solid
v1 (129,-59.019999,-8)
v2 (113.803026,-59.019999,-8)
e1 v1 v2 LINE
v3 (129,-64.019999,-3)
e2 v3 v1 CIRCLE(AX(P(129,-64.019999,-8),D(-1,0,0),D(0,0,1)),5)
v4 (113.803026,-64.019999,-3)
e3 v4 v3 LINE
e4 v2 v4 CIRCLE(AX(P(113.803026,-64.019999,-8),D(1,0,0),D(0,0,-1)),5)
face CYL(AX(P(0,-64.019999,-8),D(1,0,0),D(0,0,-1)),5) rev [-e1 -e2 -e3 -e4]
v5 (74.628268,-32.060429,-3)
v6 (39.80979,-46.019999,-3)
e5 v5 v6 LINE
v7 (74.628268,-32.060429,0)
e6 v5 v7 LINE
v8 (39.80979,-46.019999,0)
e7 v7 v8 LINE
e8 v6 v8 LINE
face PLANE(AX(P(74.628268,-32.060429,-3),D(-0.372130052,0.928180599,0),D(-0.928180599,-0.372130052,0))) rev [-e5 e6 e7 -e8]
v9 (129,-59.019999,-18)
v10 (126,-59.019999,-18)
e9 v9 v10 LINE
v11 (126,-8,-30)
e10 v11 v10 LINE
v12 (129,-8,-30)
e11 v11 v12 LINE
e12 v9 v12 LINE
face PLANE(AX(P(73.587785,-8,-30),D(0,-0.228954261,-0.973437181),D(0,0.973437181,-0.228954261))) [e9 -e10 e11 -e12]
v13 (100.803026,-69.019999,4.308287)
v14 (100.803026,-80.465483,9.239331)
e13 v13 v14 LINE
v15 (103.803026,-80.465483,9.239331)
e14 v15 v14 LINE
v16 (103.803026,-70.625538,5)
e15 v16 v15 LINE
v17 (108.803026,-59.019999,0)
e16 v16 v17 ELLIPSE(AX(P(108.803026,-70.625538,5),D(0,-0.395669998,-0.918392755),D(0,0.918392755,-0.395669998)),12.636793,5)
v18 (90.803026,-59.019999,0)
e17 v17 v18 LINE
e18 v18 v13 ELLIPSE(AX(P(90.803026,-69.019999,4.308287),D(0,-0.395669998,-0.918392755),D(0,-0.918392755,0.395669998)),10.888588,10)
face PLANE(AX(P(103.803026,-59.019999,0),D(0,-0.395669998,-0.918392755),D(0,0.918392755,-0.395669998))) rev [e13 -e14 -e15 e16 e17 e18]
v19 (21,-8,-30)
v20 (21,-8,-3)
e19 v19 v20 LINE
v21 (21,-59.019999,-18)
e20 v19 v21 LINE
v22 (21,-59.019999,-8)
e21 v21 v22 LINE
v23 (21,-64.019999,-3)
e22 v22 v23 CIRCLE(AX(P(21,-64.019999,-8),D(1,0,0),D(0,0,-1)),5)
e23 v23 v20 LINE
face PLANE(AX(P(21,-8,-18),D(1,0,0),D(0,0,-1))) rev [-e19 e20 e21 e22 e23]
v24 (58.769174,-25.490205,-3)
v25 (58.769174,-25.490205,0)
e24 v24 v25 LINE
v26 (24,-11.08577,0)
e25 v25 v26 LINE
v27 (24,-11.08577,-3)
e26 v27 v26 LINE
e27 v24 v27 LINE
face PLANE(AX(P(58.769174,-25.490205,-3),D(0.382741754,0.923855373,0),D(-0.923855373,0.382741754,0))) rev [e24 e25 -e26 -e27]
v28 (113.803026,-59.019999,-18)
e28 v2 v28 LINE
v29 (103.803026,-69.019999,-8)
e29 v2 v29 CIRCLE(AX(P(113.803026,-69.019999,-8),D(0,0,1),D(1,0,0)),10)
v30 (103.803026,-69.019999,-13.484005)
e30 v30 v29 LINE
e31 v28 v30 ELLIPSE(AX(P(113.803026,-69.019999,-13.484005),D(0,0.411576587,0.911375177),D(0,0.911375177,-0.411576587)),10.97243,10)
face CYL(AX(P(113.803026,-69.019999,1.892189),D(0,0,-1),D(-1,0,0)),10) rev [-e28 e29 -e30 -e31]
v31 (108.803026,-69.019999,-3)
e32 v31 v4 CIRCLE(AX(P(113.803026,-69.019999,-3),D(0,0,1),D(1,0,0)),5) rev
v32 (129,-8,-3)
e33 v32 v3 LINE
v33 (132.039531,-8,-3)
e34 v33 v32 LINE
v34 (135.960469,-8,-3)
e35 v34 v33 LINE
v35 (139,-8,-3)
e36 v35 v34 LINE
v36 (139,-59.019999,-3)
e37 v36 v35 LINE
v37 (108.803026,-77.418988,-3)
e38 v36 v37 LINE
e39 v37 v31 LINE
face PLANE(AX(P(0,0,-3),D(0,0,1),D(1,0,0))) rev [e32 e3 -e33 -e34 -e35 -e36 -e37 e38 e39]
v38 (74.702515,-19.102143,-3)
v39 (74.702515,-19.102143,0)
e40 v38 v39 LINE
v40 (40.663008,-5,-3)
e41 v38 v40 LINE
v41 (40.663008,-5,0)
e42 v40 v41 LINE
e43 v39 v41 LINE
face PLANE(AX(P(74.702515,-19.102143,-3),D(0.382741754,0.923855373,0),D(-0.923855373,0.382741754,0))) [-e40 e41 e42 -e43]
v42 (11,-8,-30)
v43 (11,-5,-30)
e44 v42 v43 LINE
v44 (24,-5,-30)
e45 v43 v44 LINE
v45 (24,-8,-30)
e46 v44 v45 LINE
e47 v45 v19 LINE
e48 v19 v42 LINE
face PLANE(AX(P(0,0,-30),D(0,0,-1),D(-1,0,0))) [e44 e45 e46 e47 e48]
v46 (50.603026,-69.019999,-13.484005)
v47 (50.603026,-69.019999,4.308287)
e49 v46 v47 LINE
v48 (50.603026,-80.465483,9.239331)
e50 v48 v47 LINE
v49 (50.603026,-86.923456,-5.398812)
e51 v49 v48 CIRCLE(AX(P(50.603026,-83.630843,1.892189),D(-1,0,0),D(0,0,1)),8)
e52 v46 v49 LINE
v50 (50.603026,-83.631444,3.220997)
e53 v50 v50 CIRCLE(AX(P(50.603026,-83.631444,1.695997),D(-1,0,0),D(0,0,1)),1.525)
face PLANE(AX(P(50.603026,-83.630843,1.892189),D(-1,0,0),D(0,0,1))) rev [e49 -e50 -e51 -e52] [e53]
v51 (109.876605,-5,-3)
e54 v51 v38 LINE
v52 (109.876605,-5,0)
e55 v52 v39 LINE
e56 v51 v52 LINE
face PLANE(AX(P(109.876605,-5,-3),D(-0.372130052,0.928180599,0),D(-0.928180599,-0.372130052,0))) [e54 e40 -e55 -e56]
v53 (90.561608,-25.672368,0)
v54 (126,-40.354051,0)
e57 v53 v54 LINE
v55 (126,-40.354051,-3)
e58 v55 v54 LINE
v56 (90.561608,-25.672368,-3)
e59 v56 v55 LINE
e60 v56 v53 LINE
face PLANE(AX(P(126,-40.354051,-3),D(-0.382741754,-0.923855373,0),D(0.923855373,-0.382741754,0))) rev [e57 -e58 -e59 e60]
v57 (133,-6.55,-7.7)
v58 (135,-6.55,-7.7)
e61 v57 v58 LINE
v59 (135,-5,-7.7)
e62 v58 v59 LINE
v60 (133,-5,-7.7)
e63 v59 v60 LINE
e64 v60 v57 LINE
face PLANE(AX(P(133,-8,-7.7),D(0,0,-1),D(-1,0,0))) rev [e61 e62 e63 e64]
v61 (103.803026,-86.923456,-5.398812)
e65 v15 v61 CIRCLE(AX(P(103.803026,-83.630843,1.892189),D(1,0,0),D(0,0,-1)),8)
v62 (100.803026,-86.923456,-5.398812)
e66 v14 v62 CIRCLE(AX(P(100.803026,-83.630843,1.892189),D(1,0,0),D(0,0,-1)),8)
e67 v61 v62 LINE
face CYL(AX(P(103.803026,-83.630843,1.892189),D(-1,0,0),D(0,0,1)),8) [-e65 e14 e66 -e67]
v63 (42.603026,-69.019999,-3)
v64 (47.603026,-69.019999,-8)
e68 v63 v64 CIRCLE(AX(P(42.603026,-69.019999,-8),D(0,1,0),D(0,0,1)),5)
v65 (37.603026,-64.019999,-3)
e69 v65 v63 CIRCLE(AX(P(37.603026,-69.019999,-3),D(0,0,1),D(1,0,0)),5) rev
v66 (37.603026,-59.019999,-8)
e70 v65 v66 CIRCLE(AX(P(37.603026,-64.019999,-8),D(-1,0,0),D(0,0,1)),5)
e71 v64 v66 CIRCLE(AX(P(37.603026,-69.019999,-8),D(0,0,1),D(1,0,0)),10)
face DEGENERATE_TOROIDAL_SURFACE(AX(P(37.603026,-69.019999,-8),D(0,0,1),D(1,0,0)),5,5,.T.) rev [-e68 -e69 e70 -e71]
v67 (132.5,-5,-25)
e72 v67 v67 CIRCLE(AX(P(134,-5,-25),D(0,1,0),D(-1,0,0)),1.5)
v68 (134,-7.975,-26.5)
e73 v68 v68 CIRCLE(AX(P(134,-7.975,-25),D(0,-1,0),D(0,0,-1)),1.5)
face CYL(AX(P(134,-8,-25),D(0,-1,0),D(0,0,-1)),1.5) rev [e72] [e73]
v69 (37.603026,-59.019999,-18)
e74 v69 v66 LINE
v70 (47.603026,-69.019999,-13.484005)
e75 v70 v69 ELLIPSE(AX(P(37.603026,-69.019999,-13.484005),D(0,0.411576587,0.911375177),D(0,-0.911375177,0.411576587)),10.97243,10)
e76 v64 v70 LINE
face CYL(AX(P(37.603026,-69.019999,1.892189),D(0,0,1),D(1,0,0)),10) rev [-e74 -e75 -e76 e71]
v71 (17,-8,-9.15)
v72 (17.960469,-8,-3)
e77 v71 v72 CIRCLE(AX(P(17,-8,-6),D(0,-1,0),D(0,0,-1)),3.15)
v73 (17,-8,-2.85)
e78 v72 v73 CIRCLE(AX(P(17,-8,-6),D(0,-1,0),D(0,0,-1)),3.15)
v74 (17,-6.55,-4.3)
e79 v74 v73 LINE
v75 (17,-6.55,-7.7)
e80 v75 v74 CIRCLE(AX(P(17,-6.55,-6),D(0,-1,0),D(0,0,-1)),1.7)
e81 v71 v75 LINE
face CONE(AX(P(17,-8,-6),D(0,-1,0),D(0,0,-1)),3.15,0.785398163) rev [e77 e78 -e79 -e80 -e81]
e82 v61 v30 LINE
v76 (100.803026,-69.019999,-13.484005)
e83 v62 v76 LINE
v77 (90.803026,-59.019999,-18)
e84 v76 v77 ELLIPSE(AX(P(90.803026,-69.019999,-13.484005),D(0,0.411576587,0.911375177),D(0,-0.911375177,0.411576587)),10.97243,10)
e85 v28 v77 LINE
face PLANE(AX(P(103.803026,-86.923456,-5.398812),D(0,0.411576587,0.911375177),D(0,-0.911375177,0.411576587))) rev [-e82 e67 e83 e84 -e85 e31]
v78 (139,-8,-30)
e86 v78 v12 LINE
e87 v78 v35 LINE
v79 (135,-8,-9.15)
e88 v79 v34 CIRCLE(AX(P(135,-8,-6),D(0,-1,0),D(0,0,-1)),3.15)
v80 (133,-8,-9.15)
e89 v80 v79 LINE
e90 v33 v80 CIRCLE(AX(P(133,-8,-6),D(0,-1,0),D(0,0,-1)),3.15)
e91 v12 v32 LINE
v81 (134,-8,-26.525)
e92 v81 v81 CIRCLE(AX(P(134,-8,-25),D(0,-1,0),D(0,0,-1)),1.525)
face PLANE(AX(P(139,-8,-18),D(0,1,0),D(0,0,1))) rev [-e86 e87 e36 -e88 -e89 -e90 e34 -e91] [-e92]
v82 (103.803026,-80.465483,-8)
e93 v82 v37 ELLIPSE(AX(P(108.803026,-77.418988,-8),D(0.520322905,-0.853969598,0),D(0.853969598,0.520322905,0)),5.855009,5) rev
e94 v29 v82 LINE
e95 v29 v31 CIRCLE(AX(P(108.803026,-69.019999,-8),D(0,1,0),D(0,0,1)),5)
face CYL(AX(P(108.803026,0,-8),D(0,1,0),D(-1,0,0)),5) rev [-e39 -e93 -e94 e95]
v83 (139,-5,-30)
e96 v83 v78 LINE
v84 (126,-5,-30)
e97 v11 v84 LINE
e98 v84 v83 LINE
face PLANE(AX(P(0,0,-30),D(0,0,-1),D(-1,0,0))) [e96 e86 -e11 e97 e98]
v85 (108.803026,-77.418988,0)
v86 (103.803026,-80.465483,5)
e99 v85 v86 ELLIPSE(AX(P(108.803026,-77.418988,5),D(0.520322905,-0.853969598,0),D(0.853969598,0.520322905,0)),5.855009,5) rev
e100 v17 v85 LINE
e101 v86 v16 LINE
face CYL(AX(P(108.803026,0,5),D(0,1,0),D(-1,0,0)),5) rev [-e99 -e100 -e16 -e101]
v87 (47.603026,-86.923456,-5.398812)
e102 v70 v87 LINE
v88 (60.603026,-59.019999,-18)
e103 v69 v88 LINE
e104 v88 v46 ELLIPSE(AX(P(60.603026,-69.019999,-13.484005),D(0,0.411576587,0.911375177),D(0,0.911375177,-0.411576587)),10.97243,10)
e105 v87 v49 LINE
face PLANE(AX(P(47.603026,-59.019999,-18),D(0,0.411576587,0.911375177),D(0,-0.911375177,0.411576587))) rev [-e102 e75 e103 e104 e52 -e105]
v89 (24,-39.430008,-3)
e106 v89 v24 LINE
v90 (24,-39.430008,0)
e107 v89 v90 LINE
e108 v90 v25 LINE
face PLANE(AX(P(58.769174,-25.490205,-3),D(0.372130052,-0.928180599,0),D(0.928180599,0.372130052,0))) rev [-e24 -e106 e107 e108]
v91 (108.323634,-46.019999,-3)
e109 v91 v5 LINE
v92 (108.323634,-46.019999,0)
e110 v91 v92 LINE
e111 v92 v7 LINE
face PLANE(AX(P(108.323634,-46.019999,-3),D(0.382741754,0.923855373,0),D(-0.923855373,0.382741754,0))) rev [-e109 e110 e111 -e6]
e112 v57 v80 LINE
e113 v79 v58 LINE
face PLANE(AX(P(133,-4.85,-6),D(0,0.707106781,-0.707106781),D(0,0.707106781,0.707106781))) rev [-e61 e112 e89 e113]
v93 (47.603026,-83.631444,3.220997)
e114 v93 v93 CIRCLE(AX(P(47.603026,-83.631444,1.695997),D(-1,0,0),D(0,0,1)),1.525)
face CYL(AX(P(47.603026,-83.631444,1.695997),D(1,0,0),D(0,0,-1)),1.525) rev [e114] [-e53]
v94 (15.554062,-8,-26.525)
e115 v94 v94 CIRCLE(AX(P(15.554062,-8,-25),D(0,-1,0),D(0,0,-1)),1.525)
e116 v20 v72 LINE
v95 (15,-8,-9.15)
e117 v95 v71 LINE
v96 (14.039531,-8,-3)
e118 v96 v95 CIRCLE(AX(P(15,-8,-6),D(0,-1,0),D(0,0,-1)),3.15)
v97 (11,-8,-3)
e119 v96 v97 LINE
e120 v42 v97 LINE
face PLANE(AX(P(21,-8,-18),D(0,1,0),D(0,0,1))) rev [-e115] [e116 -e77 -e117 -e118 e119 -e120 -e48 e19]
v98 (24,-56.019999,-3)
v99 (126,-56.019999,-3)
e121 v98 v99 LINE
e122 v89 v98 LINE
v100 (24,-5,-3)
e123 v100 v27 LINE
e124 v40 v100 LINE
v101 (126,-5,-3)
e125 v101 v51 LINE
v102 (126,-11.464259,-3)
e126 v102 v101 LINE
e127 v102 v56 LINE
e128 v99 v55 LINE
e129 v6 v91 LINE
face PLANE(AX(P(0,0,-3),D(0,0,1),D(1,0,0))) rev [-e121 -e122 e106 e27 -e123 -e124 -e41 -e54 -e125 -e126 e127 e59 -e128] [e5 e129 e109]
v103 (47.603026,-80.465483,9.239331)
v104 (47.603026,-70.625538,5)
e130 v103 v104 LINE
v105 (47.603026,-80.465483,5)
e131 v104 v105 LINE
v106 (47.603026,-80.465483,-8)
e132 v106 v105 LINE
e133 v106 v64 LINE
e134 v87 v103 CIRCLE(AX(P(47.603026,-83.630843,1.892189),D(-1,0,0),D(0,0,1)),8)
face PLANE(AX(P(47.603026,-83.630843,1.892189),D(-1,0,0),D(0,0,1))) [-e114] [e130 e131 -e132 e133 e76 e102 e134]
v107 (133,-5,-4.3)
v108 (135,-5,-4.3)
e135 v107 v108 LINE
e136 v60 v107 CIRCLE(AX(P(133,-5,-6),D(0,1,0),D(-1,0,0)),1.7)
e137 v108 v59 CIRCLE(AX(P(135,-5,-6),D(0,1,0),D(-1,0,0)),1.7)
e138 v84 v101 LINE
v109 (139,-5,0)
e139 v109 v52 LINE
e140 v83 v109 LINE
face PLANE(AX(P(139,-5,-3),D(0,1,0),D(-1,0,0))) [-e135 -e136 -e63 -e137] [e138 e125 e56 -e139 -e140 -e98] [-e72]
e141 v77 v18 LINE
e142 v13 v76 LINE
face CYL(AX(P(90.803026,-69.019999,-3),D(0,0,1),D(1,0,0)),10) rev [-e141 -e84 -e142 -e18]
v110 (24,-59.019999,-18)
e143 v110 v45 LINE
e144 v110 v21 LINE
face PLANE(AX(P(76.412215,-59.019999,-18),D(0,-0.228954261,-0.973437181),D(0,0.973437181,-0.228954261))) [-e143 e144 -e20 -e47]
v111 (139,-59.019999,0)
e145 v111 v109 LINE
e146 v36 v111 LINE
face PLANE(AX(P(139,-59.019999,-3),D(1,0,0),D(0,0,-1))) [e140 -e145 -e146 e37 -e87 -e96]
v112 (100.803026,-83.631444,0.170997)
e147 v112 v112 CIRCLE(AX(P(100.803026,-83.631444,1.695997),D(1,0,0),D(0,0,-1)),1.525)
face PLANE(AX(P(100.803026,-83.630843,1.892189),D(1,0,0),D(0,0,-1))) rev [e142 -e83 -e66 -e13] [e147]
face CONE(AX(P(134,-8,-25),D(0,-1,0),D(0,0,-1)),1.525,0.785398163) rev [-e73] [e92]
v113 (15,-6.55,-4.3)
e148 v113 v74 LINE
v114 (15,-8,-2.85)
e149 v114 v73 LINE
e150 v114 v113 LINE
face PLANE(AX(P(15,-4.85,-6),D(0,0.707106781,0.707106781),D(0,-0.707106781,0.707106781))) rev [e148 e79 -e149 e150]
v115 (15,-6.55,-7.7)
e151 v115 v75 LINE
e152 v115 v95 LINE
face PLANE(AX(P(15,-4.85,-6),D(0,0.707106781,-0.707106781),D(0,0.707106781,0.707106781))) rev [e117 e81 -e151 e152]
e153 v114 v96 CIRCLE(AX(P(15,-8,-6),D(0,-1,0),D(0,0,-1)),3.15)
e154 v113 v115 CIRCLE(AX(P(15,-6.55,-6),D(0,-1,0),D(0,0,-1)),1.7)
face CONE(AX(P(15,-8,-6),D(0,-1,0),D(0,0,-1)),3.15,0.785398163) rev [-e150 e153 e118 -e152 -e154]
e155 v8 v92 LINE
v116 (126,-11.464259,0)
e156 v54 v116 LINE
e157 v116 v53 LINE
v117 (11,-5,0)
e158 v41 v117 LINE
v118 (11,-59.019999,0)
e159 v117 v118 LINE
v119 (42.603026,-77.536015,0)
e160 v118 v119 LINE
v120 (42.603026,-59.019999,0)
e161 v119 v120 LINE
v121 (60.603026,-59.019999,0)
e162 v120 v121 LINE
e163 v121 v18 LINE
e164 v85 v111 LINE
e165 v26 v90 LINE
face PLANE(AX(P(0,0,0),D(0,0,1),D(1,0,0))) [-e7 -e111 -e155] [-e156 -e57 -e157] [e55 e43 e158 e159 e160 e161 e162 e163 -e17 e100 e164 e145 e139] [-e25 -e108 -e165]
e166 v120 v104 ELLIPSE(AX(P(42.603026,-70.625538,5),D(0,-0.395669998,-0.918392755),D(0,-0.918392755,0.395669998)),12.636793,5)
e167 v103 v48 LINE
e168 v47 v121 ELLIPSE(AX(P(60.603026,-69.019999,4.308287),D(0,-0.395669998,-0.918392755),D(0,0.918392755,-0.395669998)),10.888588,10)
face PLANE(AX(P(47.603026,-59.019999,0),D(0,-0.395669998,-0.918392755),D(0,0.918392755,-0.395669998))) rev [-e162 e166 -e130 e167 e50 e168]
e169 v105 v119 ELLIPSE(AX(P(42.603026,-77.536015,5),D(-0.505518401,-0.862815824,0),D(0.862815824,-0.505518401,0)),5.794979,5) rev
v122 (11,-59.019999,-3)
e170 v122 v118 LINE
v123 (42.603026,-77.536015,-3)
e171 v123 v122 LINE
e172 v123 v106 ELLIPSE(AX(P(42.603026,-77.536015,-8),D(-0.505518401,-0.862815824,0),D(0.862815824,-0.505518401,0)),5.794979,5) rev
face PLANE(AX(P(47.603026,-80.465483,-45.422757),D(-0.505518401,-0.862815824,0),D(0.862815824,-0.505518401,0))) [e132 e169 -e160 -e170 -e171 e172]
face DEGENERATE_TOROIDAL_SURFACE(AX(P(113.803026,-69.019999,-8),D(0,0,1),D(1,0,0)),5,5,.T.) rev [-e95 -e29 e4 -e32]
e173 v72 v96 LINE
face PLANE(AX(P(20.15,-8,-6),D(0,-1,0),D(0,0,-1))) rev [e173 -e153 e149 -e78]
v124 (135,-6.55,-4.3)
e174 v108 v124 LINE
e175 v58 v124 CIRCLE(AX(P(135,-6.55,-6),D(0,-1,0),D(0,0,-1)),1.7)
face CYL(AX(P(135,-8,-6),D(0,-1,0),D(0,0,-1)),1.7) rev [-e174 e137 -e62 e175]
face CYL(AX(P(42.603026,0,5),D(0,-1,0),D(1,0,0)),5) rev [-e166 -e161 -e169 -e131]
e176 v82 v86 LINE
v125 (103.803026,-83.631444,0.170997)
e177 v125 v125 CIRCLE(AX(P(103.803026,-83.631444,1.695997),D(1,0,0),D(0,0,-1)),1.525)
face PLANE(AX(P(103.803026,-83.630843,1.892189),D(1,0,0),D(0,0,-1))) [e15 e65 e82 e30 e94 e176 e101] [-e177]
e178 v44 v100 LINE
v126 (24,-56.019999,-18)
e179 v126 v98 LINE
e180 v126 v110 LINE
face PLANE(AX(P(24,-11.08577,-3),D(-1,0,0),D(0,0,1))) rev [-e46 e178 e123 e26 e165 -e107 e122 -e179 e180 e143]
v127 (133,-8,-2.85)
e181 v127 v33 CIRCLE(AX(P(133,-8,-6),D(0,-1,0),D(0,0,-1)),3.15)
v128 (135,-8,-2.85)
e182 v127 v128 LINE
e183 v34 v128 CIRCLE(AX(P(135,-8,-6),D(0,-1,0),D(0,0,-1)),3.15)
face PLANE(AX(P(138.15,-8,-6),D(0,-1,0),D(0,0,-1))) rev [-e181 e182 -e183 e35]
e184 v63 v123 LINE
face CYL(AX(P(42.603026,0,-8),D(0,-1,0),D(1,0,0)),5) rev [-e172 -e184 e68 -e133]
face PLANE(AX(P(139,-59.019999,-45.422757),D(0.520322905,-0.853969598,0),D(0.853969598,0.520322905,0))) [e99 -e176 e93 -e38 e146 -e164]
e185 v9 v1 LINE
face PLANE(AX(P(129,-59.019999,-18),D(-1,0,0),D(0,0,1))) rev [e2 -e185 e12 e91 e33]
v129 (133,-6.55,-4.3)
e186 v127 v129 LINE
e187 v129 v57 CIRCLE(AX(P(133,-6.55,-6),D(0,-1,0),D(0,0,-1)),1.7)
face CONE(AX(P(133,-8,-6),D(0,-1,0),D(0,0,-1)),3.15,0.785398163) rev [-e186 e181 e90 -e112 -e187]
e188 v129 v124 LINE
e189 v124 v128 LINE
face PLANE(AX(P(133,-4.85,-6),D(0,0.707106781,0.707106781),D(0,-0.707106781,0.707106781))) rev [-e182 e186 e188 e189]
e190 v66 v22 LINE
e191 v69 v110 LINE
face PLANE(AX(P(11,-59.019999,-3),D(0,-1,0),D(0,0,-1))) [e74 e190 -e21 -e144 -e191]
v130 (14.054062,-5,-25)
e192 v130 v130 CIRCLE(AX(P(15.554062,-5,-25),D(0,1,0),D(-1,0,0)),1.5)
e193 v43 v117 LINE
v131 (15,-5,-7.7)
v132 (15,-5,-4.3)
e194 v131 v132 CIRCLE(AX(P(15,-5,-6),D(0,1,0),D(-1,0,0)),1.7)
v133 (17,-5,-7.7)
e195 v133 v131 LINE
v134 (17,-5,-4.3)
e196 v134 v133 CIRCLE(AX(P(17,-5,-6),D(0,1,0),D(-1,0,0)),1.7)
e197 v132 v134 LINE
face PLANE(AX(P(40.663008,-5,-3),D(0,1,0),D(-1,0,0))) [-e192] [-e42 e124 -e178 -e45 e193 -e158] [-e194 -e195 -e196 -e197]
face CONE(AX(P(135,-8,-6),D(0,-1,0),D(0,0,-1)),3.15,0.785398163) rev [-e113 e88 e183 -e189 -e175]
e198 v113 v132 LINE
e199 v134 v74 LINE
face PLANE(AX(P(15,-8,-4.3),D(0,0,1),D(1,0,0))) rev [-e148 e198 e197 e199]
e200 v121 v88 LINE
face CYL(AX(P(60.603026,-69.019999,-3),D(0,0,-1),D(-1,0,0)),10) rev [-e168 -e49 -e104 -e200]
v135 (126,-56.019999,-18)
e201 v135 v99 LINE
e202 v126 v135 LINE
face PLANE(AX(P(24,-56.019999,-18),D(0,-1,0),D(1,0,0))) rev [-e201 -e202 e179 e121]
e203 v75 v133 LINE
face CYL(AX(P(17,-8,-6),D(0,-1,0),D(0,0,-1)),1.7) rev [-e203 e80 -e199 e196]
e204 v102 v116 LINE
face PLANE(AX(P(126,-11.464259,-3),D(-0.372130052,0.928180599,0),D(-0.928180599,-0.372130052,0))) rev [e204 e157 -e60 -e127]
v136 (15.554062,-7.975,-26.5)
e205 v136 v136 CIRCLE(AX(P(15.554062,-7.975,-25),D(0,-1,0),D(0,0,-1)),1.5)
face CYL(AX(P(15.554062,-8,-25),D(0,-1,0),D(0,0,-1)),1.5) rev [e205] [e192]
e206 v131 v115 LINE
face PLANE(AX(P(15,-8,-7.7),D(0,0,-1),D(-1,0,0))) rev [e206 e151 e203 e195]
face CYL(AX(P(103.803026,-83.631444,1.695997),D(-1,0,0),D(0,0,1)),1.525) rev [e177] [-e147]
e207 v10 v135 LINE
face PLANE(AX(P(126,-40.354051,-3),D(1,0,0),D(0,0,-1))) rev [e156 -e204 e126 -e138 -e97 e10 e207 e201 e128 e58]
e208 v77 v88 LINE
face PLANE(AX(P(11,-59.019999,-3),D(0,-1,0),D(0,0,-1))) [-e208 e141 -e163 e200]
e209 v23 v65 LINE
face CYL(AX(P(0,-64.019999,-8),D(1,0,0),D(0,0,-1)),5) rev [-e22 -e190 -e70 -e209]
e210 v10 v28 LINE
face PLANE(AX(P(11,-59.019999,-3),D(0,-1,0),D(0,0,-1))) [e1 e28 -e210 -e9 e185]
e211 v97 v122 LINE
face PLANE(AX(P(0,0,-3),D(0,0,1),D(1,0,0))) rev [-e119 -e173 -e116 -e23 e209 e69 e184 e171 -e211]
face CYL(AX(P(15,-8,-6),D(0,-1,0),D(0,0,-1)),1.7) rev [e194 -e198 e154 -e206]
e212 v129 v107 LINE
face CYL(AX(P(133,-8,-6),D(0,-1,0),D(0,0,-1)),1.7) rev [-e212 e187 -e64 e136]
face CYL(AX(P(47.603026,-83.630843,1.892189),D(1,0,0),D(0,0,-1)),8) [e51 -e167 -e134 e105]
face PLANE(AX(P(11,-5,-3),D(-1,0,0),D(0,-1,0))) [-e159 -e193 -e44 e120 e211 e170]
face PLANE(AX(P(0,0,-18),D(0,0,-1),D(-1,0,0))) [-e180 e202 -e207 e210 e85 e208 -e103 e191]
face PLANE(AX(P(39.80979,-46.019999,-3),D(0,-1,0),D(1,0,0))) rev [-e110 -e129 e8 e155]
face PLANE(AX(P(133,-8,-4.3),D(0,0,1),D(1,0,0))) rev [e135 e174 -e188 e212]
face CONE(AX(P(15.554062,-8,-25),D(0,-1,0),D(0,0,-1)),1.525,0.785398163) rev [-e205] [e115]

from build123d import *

# Parameters (mm, degrees)
BOSS_EXTRUDE1_DEPTH                            = 3
BOSS_EXTRUDE2_DEPTH                            = 15
SKETCH4_W                                      = 13
SKETCH4_H                                      = 3
BOSS_EXTRUDE3_DEPTH                            = 12
BOSS_EXTRUDE4_DEPTH                            = 3
BOSS_EXTRUDE5_DEPTH                            = 3
SKETCH7_R                                      = 1.525
BOSS_EXTRUDE6_DEPTH                            = 3
BOSS_EXTRUDE7_START                            = 3
SKETCH8_R                                      = 1.525
BOSS_EXTRUDE7_DEPTH                            = 3
BOSS_EXTRUDE8_DEPTH                            = 3
FILLET2_R                                      = 10
FILLET3_R                                      = 5
CSK_START                                      = -8
CSK_SLOT_FOR_M3_FLAT_HEAD_MACHINE_SCREW1_DEPTH = 3
F_3_0MM_DOWEL_HOLE2_D                          = 3
F_3_0MM_DOWEL_HOLE2_DEPTH                      = 7.5
F_3_0MM_DOWEL_HOLE2_CSINK_D                    = 3.05
F_3_0MM_DOWEL_HOLE2_CSINK_ANGLE                = 90
F_3_0MM_DOWEL_HOLE2_TIP                        = 0.901290929


with BuildPart() as part:
    # Sketch1 → Boss-Extrude1 (new body)
    with BuildSketch(Plane.XY):
        Polygon((139, -5), (109.876604516, -5), (74.70251528, -19.102143128), (40.663008058, -5), (11, -5), (11, -59.019998994), (139, -59.019998994), align=None)
        Polygon((126, -11.464259225), (90.561608439, -25.672367549), (126, -40.354051004), align=None, mode=Mode.SUBTRACT)
        Polygon((24, -11.085769738), (24, -39.430007843), (58.769174389, -25.49020487), align=None, mode=Mode.SUBTRACT)
        Polygon((39.809790244, -46.019998994), (108.323633524, -46.019998994), (74.628267548, -32.06042929), align=None, mode=Mode.SUBTRACT)
    extrude(amount=-BOSS_EXTRUDE1_DEPTH)

    # Sketch3 → Boss-Extrude2 (add)
    with BuildSketch(Plane(origin=(0, 0, -3), x_dir=(-1, 0, 0), z_dir=(0, 0, -1))):
        Polygon((-139, -8), (-139, -5), (-126, -5), (-126, -56.019998994), (-24, -56.019998994), (-24, -5), (-11, -5), (-11, -8), (-21, -8), (-21, -59.019998994), (-129, -59.019998994), (-129, -8), align=None)
    extrude(amount=BOSS_EXTRUDE2_DEPTH)

    # Sketch4 → Boss-Extrude3 (add)
    with BuildSketch(Plane(origin=(0, 0, -18), x_dir=(-1, 0, 0), z_dir=(0, 0, -1))):
        with Locations((-132.5, -6.5)):
            Rectangle(SKETCH4_W, SKETCH4_H)
        with Locations((-17.5, -6.5)):
            Rectangle(SKETCH4_W, SKETCH4_H)
    extrude(amount=BOSS_EXTRUDE3_DEPTH)

    # Sketch5 → Boss-Extrude4 (add)
    with BuildSketch(Plane.ZY.offset(-21)):
        Polygon((-30, -8), (-18, -8), (-18, -59.019998994), align=None)
    extrude(amount=-BOSS_EXTRUDE4_DEPTH)

    # Sketch6 → Boss-Extrude5 (add)
    with BuildSketch(Plane(origin=(129, 0, 0), x_dir=(0, 0, -1), z_dir=(1, 0, 0))):
        Polygon((18, -8), (18, -59.019998994), (30, -8), align=None)
    extrude(amount=-BOSS_EXTRUDE5_DEPTH)

    # Sketch7 → Boss-Extrude6 (add)
    with BuildSketch(Plane(origin=(50.603026188, 28.677278628, 20.937913876), x_dir=(0, 0.9992078437352027, -0.039795540177848664), z_dir=(-1, 0, 0))):
        with BuildLine():
            Line((-86.078252358, 42.397029499), (-86.675185461, 27.408911843))
            Line((-86.675185461, 27.408911843), (-86.794572081, 24.411288312))
            Line((-86.794572081, 24.411288312), (-108.590752447, 16.032710832))
            ThreePointArc((-108.590752447, 16.032710832), (-118.903275809, 20.564727028), (-114.461076578, 30.916257103))
            Line((-114.461076578, 30.916257103), (-86.078252358, 42.397029499))
        make_face()
        with Locations(Location((-111.454014111, 23.696060126, 0), (0, 0, 267.719281244))):
            Circle(SKETCH7_R, mode=Mode.SUBTRACT)
    extrude(amount=BOSS_EXTRUDE6_DEPTH)

    # Sketch8 → Boss-Extrude7 (add)
    with BuildSketch(Plane(origin=(100.803026188, 28.677278628, 20.937913876), x_dir=(0, -0.9992078437352027, 0.039795540177848664), z_dir=(1, 0, 0)).offset(BOSS_EXTRUDE7_START)):
        with BuildLine():
            Line((86.078252358, 42.397029499), (86.675185461, 27.408911843))
            Line((86.675185461, 27.408911843), (86.794572081, 24.411288312))
            Line((86.794572081, 24.411288312), (108.590752447, 16.032710832))
            ThreePointArc((108.590752447, 16.032710832), (118.903275809, 20.564727028), (114.461076578, 30.916257103))
            Line((114.461076578, 30.916257103), (86.078252358, 42.397029499))
        make_face()
        with Locations(Location((111.454014111, 23.696060126, 0), (0, 0, 272.280718756))):
            Circle(SKETCH8_R, mode=Mode.SUBTRACT)
    extrude(amount=-BOSS_EXTRUDE7_DEPTH)

    # Sketch9 → Boss-Extrude8 (add)
    with BuildSketch(Plane.XY):
        Polygon((11, -59.019998994), (47.603026188, -59.019998994), (47.603026188, -80.465483362), align=None)
        Polygon((103.803026188, -59.019998994), (139, -59.019998994), (103.803026188, -80.465483362), align=None)
    extrude(amount=-BOSS_EXTRUDE8_DEPTH)

    # Fillet2
    fillet2_edges = [part.edges().sort_by_distance(p)[0] for p in [
        (50.603026188, -59.019998994, -9),
        (103.803026188, -59.019998994, -10.5),
        (100.803026188, -59.019998994, -9),
        (47.603026188, -59.019998994, -10.5),
    ]]
    fillet(fillet2_edges, radius=FILLET2_R)

    # Fillet3
    fillet3_edges = [part.edges().sort_by_distance(p)[0] for p in [
        (47.603026188, -69.742741178, 0),
        (29.301513094, -59.019998994, -3),
        (103.803026188, -69.742741178, 0),
        (103.803026188, -74.742741178, -3),
        (121.401513094, -59.019998994, -3),
        (106.731958376, -61.948931182, -3),
        (47.603026188, -74.742741178, -3),
        (44.674094, -61.948931182, -3),
    ]]
    fillet(fillet3_edges, radius=FILLET3_R)

    # CSK SLOT for M3 Flat Head Machine Screw1: read off the stored shape, not the designer's step
    # CSK SLOT for M3 Flat Head Machine Sc 2 → CSK SLOT for M3 Flat Head Machine Screw1 (cut)
    with BuildSketch(Plane(origin=(0, 0, 0), x_dir=(1, 0, 0), z_dir=(0, 1, 0)).offset(CSK_START)):
        with BuildLine():
            ThreePointArc((17, 4.3), (18.7, 6), (17, 7.7))
            Line((17, 7.7), (15, 7.7))
            ThreePointArc((15, 7.7), (13.3, 6), (15, 4.3))
            Line((15, 4.3), (17, 4.3))
        make_face()
        with BuildLine():
            ThreePointArc((133, 7.7), (131.3, 6), (133, 4.3))
            Line((133, 4.3), (135, 4.3))
            ThreePointArc((135, 4.3), (136.7, 6), (135, 7.7))
            Line((135, 7.7), (133, 7.7))
        make_face()
    extrude(amount=CSK_SLOT_FOR_M3_FLAT_HEAD_MACHINE_SCREW1_DEPTH, mode=Mode.SUBTRACT)

    # CSK SLOT for M3 Flat Head Machine Sc 3: loft between two sections, ruled curve by curve
    csk_slot_for_m3_flat_head_machine_sc_3_from = [
        Edge.make_three_point_arc((17, -6.55, -7.7), (18.202081528, -6.55, -7.202081528), (18.7, -6.55, -6)),
        Edge.make_three_point_arc((18.7, -6.55, -6), (18.202081528, -6.55, -4.797918472), (17, -6.55, -4.3)),
        Edge.make_three_point_arc((15, -6.55, -4.3), (13.797918472, -6.55, -4.797918472), (13.3, -6.55, -6)),
        Edge.make_three_point_arc((13.3, -6.55, -6), (13.797918472, -6.55, -7.202081528), (15, -6.55, -7.7)),
        Edge.make_line((17, -6.55, -4.3), (15, -6.55, -4.3)),
        Edge.make_line((17, -6.55, -7.7), (15, -6.55, -7.7)),
    ]
    csk_slot_for_m3_flat_head_machine_sc_3_to = [
        Edge.make_three_point_arc((17, -8, -9.15), (19.227386361, -8, -8.227386361), (20.15, -8, -6)),
        Edge.make_three_point_arc((20.15, -8, -6), (19.227386361, -8, -3.772613639), (17, -8, -2.85)),
        Edge.make_three_point_arc((15, -8, -2.85), (12.772613639, -8, -3.772613639), (11.85, -8, -6)),
        Edge.make_three_point_arc((11.85, -8, -6), (12.772613639, -8, -8.227386361), (15, -8, -9.15)),
        Edge.make_line((17, -8, -2.85), (15, -8, -2.85)),
        Edge.make_line((17, -8, -9.15), (15, -8, -9.15)),
    ]
    csk_slot_for_m3_flat_head_machine_sc_3 = Solid(Shell([*[Face.make_surface_from_curves(csk_slot_for_m3_flat_head_machine_sc_3_from[k], csk_slot_for_m3_flat_head_machine_sc_3_to[k]) for k in range(6)], Face(Wire(csk_slot_for_m3_flat_head_machine_sc_3_from)), Face(Wire(csk_slot_for_m3_flat_head_machine_sc_3_to))]))
    add(csk_slot_for_m3_flat_head_machine_sc_3, mode=Mode.SUBTRACT)

    # CSK SLOT for M3 Flat Head Machine Sc 4: loft between two sections, ruled curve by curve
    csk_slot_for_m3_flat_head_machine_sc_4_from = [
        Edge.make_three_point_arc((135, -6.55, -7.7), (136.202081528, -6.55, -7.202081528), (136.7, -6.55, -6)),
        Edge.make_three_point_arc((136.7, -6.55, -6), (136.202081528, -6.55, -4.797918472), (135, -6.55, -4.3)),
        Edge.make_three_point_arc((133, -6.55, -4.3), (131.797918472, -6.55, -4.797918472), (131.3, -6.55, -6)),
        Edge.make_three_point_arc((131.3, -6.55, -6), (131.797918472, -6.55, -7.202081528), (133, -6.55, -7.7)),
        Edge.make_line((135, -6.55, -4.3), (133, -6.55, -4.3)),
        Edge.make_line((135, -6.55, -7.7), (133, -6.55, -7.7)),
    ]
    csk_slot_for_m3_flat_head_machine_sc_4_to = [
        Edge.make_three_point_arc((135, -8, -9.15), (137.227386361, -8, -8.227386361), (138.15, -8, -6)),
        Edge.make_three_point_arc((138.15, -8, -6), (137.227386361, -8, -3.772613639), (135, -8, -2.85)),
        Edge.make_three_point_arc((133, -8, -2.85), (130.772613639, -8, -3.772613639), (129.85, -8, -6)),
        Edge.make_three_point_arc((129.85, -8, -6), (130.772613639, -8, -8.227386361), (133, -8, -9.15)),
        Edge.make_line((135, -8, -2.85), (133, -8, -2.85)),
        Edge.make_line((135, -8, -9.15), (133, -8, -9.15)),
    ]
    csk_slot_for_m3_flat_head_machine_sc_4 = Solid(Shell([*[Face.make_surface_from_curves(csk_slot_for_m3_flat_head_machine_sc_4_from[k], csk_slot_for_m3_flat_head_machine_sc_4_to[k]) for k in range(6)], Face(Wire(csk_slot_for_m3_flat_head_machine_sc_4_from)), Face(Wire(csk_slot_for_m3_flat_head_machine_sc_4_to))]))
    add(csk_slot_for_m3_flat_head_machine_sc_4, mode=Mode.SUBTRACT)

    # Ø3.0mm Dowel Hole2
    with Locations(Plane(origin=(134, -8, -25), x_dir=(0, 0, -1), z_dir=(0, -1, 0))):
        with Locations((0, 0), (0, -118.445937781)):
            CounterSinkHole(F_3_0MM_DOWEL_HOLE2_D / 2, F_3_0MM_DOWEL_HOLE2_CSINK_D / 2, depth=F_3_0MM_DOWEL_HOLE2_DEPTH, counter_sink_angle=F_3_0MM_DOWEL_HOLE2_CSINK_ANGLE)
            with Locations((0, 0, -(F_3_0MM_DOWEL_HOLE2_DEPTH + F_3_0MM_DOWEL_HOLE2_TIP / 2))):  # 118° drill point
                Cone(0, F_3_0MM_DOWEL_HOLE2_D / 2, F_3_0MM_DOWEL_HOLE2_TIP, mode=Mode.SUBTRACT)


solid = part.part
